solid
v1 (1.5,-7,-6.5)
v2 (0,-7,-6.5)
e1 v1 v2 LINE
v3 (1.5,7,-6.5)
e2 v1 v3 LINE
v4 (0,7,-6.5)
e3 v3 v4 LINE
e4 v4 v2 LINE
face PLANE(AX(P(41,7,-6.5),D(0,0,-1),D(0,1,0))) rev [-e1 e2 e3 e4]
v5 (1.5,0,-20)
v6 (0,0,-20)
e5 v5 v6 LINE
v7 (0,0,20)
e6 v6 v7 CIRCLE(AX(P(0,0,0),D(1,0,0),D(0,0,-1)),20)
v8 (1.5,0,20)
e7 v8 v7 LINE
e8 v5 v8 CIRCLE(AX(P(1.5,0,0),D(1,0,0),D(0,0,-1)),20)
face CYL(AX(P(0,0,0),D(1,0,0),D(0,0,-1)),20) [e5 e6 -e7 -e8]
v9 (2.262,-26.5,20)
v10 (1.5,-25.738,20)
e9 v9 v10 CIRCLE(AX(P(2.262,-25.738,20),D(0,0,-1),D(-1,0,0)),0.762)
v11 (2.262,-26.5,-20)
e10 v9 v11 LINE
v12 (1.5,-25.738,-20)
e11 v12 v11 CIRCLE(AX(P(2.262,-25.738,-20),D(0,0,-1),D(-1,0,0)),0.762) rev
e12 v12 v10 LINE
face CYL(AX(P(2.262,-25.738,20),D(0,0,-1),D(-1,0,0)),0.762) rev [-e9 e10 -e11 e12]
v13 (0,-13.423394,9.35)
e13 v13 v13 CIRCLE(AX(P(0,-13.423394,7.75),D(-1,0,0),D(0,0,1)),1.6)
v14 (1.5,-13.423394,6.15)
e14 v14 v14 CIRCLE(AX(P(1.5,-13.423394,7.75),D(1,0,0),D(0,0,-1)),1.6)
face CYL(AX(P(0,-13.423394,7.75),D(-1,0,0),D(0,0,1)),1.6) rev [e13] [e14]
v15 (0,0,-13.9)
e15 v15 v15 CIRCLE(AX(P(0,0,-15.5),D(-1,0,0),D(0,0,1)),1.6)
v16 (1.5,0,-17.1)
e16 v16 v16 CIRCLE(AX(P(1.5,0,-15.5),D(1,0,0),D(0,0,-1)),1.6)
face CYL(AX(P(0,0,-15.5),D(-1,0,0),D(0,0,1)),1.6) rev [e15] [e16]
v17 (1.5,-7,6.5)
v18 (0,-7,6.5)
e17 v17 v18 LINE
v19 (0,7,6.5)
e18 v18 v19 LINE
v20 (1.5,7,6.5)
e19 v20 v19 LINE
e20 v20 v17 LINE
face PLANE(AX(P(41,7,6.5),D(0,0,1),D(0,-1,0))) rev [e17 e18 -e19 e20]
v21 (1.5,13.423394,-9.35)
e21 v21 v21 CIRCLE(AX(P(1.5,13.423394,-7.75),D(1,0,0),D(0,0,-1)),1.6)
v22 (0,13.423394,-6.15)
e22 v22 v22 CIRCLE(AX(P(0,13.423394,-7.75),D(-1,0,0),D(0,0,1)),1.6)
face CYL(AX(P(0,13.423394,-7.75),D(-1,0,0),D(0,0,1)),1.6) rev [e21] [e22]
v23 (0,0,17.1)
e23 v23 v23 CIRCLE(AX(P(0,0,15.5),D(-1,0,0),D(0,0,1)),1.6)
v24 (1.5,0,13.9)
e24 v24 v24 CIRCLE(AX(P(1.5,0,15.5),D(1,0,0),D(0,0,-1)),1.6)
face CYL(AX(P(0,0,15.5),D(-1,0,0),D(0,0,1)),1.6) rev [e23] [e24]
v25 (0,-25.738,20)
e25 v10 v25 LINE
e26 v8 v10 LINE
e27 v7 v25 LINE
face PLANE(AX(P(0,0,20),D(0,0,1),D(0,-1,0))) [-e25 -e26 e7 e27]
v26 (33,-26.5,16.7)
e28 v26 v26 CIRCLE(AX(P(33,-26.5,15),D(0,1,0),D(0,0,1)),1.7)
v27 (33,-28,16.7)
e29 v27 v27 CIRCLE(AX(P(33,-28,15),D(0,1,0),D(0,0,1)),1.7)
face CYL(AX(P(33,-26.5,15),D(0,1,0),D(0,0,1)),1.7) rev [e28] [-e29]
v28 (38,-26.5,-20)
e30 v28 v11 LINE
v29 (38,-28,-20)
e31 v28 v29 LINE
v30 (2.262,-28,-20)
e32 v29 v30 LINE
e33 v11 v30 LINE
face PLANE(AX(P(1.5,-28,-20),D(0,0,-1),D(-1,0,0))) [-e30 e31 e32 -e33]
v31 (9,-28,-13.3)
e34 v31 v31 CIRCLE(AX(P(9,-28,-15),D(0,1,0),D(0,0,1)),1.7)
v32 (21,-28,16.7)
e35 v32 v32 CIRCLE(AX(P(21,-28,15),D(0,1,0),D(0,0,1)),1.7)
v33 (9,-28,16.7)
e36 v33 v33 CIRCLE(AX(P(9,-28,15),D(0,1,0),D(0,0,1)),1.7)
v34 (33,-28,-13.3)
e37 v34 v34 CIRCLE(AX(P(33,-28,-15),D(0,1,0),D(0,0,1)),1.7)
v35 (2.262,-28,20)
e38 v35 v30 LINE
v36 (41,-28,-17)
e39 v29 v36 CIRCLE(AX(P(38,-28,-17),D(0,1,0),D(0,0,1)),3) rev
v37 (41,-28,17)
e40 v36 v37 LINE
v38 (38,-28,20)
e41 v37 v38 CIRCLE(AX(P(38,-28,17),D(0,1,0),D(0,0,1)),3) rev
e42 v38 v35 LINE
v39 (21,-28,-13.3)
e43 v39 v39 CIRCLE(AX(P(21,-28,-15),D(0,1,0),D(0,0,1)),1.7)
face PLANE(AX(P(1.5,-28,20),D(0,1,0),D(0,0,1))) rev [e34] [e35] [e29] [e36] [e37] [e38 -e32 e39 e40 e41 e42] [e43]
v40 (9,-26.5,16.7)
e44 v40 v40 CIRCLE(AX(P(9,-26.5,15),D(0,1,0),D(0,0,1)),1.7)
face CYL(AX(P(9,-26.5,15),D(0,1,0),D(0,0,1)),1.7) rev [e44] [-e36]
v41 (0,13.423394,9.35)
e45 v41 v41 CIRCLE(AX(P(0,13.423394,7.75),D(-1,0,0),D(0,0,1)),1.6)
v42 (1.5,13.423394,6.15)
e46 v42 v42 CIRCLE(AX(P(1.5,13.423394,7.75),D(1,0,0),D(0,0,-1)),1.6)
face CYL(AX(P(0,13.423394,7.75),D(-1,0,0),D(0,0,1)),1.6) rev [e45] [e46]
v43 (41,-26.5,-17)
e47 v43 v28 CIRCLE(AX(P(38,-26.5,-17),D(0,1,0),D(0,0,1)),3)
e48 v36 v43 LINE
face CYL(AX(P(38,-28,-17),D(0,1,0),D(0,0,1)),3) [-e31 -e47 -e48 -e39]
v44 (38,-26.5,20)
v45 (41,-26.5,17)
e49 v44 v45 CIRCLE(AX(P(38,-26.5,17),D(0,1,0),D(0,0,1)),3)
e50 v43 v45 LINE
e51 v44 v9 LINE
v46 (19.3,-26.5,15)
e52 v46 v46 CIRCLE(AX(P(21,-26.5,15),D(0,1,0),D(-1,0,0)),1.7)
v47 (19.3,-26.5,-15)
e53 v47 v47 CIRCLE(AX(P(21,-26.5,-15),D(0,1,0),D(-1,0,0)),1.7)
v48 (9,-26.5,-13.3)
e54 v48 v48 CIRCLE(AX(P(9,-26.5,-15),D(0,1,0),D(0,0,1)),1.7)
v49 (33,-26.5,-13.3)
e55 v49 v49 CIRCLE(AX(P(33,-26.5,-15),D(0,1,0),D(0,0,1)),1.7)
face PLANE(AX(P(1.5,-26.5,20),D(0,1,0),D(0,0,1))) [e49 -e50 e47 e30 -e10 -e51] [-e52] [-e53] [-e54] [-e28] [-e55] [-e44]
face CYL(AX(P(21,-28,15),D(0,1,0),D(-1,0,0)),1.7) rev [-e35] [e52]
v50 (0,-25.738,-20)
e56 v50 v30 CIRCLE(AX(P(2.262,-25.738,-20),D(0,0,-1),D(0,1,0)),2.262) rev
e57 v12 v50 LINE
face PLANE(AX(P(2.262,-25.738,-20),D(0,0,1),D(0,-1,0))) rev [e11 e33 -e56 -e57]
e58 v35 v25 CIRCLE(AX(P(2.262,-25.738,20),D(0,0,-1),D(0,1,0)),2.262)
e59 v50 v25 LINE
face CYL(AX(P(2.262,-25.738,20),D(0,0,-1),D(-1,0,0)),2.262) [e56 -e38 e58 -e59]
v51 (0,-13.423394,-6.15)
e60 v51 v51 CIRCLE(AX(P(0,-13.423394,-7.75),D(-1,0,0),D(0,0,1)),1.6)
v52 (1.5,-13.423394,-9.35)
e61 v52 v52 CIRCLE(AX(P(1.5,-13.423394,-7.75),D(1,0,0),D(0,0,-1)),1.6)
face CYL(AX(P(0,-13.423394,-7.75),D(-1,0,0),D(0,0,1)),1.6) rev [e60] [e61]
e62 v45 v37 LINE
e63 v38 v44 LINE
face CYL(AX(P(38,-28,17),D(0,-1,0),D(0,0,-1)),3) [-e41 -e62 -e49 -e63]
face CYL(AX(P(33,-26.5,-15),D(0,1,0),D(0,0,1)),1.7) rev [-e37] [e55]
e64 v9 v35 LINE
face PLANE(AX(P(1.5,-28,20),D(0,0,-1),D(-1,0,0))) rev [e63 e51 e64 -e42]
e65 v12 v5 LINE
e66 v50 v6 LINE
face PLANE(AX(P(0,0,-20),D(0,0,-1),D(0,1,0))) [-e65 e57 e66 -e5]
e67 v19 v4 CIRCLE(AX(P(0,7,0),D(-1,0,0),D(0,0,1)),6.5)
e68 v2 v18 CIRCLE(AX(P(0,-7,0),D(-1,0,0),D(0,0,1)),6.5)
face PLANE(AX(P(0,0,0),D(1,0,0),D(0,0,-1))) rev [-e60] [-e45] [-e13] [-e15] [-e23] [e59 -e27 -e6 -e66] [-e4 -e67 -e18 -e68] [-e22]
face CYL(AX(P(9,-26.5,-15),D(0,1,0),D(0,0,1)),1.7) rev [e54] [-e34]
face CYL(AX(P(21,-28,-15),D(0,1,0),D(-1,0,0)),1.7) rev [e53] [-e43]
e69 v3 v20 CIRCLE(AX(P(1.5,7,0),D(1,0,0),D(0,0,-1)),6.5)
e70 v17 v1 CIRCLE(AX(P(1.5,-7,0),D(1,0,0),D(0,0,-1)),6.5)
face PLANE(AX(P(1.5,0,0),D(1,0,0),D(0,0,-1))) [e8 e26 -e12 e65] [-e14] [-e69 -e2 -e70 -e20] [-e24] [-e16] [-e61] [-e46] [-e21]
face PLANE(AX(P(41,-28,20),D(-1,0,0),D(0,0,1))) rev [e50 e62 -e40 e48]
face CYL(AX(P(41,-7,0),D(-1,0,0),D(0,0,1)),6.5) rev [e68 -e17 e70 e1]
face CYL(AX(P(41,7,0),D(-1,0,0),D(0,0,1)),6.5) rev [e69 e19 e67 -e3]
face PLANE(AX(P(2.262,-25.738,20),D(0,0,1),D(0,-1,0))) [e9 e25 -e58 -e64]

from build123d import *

# Parameters (mm, degrees)
BOSS_EXTRUDE1_DEPTH     = 1.5
SKETCH2_W               = 41
SKETCH2_H               = 40
BOSS_EXTRUDE2_DEPTH     = 1.5
CONVERT_SOLID1_START    = -20
CONVERT_SOLID1_DEPTH    = 40
CONVERT_SOLID1_2_DEPTH  = 40
M3_CLEARANCE_HOLE1_D    = 3.2
CIRPATTERN1_COUNT       = 6
CUT_EXTRUDE1_DEPTH      = 54.525694764
M3_CLEARANCE_HOLE2_D    = 3.4
LPATTERN1_COUNT         = 2
LPATTERN1_PITCH         = 24
LPATTERN1_COPY_1_D      = 3.4
FILLET1_R               = 3
CUT_EXTRUDE2_DEPTH      = 10
CUT_EXTRUDE2_DEPTH_BACK = 66.140233343
SKETCH12_R              = 1.7


# Read off the part's stored shape, not the designer's step: Convert-Solid1
with BuildPart() as part:
    # Sketch1 → Boss-Extrude1 (new body)
    with BuildSketch(Plane(origin=(0, 0, 0), x_dir=(0, 0, -1), z_dir=(1, 0, 0))):
        with BuildLine():
            Line((-20, 0), (-20, -28))
            Line((-20, -28), (20, -28))
            Line((20, -28), (20, 0))
            ThreePointArc((20, 0), (0, 20), (-20, 0))
        make_face()
    extrude(amount=BOSS_EXTRUDE1_DEPTH)

    # Sketch2 → Boss-Extrude2 (add)
    with BuildSketch(Plane.XZ.offset(28)):
        with Locations((20.5, 0)):
            Rectangle(SKETCH2_W, SKETCH2_H)
    extrude(amount=-BOSS_EXTRUDE2_DEPTH)

    # Convert-Solid1 outline → Convert-Solid1 (cut)
    with BuildSketch(Plane.XY.offset(CONVERT_SOLID1_START)):
        with BuildLine():
            Line((0, -28), (2.262, -28))
            ThreePointArc((2.262, -28), (0.662524461, -27.337475539), (0, -25.738))
            Line((0, -25.738), (0, -28))
        make_face()
    extrude(amount=CONVERT_SOLID1_DEPTH, mode=Mode.SUBTRACT)

    # Convert-Solid1 2 outline → Convert-Solid1 2 (add)
    with BuildSketch(Plane.XY.offset(CONVERT_SOLID1_START)):
        with BuildLine():
            Line((1.5, -26.5), (2.262, -26.5))
            ThreePointArc((2.262, -26.5), (1.723184633, -26.276815367), (1.5, -25.738))
            Line((1.5, -25.738), (1.5, -26.5))
        make_face()
    extrude(amount=CONVERT_SOLID1_2_DEPTH)

    # M3 Clearance Hole1 (through all)
    with Locations(Plane.ZY):
        with Locations((-15.5, 0)):
            m3_clearance_hole1 = Hole(M3_CLEARANCE_HOLE1_D / 2)

    # CirPattern1: M3 Clearance Hole1 ×6 about axis
    cirpattern1_axis = Axis((0, 0, 0), (1, 0, 0))
    for i in range(1, CIRPATTERN1_COUNT):
        add(m3_clearance_hole1.rotate(cirpattern1_axis, i * 360 / CIRPATTERN1_COUNT), mode=Mode.SUBTRACT)

    # Sketch9 → Cut-Extrude1 (cut, through all)
    with BuildSketch(Plane.ZY):
        with BuildLine():
            Line((6.5, 7), (6.5, -7))
            ThreePointArc((6.5, -7), (0, -13.5), (-6.5, -7))
            Line((-6.5, -7), (-6.5, 7))
            ThreePointArc((-6.5, 7), (0, 13.5), (6.5, 7))
        make_face()
    extrude(amount=-CUT_EXTRUDE1_DEPTH, mode=Mode.SUBTRACT)

    # M3 Clearance Hole2 (through all)
    with Locations(Plane(origin=(0, -26.5, 0), x_dir=(1, 0, 0), z_dir=(0, 1, 0))):
        with Locations((33, 15)):
            m3_clearance_hole2 = Hole(M3_CLEARANCE_HOLE2_D / 2)

    # Mirror1: M3 Clearance Hole2 across plane
    add(m3_clearance_hole2.mirror(Plane.XY), mode=Mode.SUBTRACT)

    # LPattern1: M3 Clearance Hole2 ×2
    with Locations(*[(-i * LPATTERN1_PITCH, 0, 0) for i in range(1, LPATTERN1_COUNT)]):
        add(m3_clearance_hole2, mode=Mode.SUBTRACT)

    # LPattern1 copy 1 (through all)
    with Locations(Plane(origin=(-24, -26.5, 0), x_dir=(1, 0, 0), z_dir=(0, 1, 0))):
        with Locations((33, -15)):
            Hole(LPATTERN1_COPY_1_D / 2)

    # Fillet1
    fillet1_edges = [part.edges().sort_by_distance(p)[0] for p in [
        (41, -27.25, 20),
        (41, -27.25, -20),
    ]]
    fillet(fillet1_edges, radius=FILLET1_R)

    # Sketch12 → Cut-Extrude2 (cut, two sides: drawn at the far end of the back side and taken through both)
    with BuildSketch(Plane(origin=(0, -26.5, 0), x_dir=(1, 0, 0), z_dir=(0, 1, 0)).offset(-CUT_EXTRUDE2_DEPTH_BACK)):
        with Locations(Location((21, 15, 0), (0, 0, 180))):
            Circle(SKETCH12_R)
        with Locations(Location((21, -15, 0), (0, 0, 180))):
            Circle(SKETCH12_R)
    extrude(amount=CUT_EXTRUDE2_DEPTH + CUT_EXTRUDE2_DEPTH_BACK, mode=Mode.SUBTRACT)


solid = part.part
